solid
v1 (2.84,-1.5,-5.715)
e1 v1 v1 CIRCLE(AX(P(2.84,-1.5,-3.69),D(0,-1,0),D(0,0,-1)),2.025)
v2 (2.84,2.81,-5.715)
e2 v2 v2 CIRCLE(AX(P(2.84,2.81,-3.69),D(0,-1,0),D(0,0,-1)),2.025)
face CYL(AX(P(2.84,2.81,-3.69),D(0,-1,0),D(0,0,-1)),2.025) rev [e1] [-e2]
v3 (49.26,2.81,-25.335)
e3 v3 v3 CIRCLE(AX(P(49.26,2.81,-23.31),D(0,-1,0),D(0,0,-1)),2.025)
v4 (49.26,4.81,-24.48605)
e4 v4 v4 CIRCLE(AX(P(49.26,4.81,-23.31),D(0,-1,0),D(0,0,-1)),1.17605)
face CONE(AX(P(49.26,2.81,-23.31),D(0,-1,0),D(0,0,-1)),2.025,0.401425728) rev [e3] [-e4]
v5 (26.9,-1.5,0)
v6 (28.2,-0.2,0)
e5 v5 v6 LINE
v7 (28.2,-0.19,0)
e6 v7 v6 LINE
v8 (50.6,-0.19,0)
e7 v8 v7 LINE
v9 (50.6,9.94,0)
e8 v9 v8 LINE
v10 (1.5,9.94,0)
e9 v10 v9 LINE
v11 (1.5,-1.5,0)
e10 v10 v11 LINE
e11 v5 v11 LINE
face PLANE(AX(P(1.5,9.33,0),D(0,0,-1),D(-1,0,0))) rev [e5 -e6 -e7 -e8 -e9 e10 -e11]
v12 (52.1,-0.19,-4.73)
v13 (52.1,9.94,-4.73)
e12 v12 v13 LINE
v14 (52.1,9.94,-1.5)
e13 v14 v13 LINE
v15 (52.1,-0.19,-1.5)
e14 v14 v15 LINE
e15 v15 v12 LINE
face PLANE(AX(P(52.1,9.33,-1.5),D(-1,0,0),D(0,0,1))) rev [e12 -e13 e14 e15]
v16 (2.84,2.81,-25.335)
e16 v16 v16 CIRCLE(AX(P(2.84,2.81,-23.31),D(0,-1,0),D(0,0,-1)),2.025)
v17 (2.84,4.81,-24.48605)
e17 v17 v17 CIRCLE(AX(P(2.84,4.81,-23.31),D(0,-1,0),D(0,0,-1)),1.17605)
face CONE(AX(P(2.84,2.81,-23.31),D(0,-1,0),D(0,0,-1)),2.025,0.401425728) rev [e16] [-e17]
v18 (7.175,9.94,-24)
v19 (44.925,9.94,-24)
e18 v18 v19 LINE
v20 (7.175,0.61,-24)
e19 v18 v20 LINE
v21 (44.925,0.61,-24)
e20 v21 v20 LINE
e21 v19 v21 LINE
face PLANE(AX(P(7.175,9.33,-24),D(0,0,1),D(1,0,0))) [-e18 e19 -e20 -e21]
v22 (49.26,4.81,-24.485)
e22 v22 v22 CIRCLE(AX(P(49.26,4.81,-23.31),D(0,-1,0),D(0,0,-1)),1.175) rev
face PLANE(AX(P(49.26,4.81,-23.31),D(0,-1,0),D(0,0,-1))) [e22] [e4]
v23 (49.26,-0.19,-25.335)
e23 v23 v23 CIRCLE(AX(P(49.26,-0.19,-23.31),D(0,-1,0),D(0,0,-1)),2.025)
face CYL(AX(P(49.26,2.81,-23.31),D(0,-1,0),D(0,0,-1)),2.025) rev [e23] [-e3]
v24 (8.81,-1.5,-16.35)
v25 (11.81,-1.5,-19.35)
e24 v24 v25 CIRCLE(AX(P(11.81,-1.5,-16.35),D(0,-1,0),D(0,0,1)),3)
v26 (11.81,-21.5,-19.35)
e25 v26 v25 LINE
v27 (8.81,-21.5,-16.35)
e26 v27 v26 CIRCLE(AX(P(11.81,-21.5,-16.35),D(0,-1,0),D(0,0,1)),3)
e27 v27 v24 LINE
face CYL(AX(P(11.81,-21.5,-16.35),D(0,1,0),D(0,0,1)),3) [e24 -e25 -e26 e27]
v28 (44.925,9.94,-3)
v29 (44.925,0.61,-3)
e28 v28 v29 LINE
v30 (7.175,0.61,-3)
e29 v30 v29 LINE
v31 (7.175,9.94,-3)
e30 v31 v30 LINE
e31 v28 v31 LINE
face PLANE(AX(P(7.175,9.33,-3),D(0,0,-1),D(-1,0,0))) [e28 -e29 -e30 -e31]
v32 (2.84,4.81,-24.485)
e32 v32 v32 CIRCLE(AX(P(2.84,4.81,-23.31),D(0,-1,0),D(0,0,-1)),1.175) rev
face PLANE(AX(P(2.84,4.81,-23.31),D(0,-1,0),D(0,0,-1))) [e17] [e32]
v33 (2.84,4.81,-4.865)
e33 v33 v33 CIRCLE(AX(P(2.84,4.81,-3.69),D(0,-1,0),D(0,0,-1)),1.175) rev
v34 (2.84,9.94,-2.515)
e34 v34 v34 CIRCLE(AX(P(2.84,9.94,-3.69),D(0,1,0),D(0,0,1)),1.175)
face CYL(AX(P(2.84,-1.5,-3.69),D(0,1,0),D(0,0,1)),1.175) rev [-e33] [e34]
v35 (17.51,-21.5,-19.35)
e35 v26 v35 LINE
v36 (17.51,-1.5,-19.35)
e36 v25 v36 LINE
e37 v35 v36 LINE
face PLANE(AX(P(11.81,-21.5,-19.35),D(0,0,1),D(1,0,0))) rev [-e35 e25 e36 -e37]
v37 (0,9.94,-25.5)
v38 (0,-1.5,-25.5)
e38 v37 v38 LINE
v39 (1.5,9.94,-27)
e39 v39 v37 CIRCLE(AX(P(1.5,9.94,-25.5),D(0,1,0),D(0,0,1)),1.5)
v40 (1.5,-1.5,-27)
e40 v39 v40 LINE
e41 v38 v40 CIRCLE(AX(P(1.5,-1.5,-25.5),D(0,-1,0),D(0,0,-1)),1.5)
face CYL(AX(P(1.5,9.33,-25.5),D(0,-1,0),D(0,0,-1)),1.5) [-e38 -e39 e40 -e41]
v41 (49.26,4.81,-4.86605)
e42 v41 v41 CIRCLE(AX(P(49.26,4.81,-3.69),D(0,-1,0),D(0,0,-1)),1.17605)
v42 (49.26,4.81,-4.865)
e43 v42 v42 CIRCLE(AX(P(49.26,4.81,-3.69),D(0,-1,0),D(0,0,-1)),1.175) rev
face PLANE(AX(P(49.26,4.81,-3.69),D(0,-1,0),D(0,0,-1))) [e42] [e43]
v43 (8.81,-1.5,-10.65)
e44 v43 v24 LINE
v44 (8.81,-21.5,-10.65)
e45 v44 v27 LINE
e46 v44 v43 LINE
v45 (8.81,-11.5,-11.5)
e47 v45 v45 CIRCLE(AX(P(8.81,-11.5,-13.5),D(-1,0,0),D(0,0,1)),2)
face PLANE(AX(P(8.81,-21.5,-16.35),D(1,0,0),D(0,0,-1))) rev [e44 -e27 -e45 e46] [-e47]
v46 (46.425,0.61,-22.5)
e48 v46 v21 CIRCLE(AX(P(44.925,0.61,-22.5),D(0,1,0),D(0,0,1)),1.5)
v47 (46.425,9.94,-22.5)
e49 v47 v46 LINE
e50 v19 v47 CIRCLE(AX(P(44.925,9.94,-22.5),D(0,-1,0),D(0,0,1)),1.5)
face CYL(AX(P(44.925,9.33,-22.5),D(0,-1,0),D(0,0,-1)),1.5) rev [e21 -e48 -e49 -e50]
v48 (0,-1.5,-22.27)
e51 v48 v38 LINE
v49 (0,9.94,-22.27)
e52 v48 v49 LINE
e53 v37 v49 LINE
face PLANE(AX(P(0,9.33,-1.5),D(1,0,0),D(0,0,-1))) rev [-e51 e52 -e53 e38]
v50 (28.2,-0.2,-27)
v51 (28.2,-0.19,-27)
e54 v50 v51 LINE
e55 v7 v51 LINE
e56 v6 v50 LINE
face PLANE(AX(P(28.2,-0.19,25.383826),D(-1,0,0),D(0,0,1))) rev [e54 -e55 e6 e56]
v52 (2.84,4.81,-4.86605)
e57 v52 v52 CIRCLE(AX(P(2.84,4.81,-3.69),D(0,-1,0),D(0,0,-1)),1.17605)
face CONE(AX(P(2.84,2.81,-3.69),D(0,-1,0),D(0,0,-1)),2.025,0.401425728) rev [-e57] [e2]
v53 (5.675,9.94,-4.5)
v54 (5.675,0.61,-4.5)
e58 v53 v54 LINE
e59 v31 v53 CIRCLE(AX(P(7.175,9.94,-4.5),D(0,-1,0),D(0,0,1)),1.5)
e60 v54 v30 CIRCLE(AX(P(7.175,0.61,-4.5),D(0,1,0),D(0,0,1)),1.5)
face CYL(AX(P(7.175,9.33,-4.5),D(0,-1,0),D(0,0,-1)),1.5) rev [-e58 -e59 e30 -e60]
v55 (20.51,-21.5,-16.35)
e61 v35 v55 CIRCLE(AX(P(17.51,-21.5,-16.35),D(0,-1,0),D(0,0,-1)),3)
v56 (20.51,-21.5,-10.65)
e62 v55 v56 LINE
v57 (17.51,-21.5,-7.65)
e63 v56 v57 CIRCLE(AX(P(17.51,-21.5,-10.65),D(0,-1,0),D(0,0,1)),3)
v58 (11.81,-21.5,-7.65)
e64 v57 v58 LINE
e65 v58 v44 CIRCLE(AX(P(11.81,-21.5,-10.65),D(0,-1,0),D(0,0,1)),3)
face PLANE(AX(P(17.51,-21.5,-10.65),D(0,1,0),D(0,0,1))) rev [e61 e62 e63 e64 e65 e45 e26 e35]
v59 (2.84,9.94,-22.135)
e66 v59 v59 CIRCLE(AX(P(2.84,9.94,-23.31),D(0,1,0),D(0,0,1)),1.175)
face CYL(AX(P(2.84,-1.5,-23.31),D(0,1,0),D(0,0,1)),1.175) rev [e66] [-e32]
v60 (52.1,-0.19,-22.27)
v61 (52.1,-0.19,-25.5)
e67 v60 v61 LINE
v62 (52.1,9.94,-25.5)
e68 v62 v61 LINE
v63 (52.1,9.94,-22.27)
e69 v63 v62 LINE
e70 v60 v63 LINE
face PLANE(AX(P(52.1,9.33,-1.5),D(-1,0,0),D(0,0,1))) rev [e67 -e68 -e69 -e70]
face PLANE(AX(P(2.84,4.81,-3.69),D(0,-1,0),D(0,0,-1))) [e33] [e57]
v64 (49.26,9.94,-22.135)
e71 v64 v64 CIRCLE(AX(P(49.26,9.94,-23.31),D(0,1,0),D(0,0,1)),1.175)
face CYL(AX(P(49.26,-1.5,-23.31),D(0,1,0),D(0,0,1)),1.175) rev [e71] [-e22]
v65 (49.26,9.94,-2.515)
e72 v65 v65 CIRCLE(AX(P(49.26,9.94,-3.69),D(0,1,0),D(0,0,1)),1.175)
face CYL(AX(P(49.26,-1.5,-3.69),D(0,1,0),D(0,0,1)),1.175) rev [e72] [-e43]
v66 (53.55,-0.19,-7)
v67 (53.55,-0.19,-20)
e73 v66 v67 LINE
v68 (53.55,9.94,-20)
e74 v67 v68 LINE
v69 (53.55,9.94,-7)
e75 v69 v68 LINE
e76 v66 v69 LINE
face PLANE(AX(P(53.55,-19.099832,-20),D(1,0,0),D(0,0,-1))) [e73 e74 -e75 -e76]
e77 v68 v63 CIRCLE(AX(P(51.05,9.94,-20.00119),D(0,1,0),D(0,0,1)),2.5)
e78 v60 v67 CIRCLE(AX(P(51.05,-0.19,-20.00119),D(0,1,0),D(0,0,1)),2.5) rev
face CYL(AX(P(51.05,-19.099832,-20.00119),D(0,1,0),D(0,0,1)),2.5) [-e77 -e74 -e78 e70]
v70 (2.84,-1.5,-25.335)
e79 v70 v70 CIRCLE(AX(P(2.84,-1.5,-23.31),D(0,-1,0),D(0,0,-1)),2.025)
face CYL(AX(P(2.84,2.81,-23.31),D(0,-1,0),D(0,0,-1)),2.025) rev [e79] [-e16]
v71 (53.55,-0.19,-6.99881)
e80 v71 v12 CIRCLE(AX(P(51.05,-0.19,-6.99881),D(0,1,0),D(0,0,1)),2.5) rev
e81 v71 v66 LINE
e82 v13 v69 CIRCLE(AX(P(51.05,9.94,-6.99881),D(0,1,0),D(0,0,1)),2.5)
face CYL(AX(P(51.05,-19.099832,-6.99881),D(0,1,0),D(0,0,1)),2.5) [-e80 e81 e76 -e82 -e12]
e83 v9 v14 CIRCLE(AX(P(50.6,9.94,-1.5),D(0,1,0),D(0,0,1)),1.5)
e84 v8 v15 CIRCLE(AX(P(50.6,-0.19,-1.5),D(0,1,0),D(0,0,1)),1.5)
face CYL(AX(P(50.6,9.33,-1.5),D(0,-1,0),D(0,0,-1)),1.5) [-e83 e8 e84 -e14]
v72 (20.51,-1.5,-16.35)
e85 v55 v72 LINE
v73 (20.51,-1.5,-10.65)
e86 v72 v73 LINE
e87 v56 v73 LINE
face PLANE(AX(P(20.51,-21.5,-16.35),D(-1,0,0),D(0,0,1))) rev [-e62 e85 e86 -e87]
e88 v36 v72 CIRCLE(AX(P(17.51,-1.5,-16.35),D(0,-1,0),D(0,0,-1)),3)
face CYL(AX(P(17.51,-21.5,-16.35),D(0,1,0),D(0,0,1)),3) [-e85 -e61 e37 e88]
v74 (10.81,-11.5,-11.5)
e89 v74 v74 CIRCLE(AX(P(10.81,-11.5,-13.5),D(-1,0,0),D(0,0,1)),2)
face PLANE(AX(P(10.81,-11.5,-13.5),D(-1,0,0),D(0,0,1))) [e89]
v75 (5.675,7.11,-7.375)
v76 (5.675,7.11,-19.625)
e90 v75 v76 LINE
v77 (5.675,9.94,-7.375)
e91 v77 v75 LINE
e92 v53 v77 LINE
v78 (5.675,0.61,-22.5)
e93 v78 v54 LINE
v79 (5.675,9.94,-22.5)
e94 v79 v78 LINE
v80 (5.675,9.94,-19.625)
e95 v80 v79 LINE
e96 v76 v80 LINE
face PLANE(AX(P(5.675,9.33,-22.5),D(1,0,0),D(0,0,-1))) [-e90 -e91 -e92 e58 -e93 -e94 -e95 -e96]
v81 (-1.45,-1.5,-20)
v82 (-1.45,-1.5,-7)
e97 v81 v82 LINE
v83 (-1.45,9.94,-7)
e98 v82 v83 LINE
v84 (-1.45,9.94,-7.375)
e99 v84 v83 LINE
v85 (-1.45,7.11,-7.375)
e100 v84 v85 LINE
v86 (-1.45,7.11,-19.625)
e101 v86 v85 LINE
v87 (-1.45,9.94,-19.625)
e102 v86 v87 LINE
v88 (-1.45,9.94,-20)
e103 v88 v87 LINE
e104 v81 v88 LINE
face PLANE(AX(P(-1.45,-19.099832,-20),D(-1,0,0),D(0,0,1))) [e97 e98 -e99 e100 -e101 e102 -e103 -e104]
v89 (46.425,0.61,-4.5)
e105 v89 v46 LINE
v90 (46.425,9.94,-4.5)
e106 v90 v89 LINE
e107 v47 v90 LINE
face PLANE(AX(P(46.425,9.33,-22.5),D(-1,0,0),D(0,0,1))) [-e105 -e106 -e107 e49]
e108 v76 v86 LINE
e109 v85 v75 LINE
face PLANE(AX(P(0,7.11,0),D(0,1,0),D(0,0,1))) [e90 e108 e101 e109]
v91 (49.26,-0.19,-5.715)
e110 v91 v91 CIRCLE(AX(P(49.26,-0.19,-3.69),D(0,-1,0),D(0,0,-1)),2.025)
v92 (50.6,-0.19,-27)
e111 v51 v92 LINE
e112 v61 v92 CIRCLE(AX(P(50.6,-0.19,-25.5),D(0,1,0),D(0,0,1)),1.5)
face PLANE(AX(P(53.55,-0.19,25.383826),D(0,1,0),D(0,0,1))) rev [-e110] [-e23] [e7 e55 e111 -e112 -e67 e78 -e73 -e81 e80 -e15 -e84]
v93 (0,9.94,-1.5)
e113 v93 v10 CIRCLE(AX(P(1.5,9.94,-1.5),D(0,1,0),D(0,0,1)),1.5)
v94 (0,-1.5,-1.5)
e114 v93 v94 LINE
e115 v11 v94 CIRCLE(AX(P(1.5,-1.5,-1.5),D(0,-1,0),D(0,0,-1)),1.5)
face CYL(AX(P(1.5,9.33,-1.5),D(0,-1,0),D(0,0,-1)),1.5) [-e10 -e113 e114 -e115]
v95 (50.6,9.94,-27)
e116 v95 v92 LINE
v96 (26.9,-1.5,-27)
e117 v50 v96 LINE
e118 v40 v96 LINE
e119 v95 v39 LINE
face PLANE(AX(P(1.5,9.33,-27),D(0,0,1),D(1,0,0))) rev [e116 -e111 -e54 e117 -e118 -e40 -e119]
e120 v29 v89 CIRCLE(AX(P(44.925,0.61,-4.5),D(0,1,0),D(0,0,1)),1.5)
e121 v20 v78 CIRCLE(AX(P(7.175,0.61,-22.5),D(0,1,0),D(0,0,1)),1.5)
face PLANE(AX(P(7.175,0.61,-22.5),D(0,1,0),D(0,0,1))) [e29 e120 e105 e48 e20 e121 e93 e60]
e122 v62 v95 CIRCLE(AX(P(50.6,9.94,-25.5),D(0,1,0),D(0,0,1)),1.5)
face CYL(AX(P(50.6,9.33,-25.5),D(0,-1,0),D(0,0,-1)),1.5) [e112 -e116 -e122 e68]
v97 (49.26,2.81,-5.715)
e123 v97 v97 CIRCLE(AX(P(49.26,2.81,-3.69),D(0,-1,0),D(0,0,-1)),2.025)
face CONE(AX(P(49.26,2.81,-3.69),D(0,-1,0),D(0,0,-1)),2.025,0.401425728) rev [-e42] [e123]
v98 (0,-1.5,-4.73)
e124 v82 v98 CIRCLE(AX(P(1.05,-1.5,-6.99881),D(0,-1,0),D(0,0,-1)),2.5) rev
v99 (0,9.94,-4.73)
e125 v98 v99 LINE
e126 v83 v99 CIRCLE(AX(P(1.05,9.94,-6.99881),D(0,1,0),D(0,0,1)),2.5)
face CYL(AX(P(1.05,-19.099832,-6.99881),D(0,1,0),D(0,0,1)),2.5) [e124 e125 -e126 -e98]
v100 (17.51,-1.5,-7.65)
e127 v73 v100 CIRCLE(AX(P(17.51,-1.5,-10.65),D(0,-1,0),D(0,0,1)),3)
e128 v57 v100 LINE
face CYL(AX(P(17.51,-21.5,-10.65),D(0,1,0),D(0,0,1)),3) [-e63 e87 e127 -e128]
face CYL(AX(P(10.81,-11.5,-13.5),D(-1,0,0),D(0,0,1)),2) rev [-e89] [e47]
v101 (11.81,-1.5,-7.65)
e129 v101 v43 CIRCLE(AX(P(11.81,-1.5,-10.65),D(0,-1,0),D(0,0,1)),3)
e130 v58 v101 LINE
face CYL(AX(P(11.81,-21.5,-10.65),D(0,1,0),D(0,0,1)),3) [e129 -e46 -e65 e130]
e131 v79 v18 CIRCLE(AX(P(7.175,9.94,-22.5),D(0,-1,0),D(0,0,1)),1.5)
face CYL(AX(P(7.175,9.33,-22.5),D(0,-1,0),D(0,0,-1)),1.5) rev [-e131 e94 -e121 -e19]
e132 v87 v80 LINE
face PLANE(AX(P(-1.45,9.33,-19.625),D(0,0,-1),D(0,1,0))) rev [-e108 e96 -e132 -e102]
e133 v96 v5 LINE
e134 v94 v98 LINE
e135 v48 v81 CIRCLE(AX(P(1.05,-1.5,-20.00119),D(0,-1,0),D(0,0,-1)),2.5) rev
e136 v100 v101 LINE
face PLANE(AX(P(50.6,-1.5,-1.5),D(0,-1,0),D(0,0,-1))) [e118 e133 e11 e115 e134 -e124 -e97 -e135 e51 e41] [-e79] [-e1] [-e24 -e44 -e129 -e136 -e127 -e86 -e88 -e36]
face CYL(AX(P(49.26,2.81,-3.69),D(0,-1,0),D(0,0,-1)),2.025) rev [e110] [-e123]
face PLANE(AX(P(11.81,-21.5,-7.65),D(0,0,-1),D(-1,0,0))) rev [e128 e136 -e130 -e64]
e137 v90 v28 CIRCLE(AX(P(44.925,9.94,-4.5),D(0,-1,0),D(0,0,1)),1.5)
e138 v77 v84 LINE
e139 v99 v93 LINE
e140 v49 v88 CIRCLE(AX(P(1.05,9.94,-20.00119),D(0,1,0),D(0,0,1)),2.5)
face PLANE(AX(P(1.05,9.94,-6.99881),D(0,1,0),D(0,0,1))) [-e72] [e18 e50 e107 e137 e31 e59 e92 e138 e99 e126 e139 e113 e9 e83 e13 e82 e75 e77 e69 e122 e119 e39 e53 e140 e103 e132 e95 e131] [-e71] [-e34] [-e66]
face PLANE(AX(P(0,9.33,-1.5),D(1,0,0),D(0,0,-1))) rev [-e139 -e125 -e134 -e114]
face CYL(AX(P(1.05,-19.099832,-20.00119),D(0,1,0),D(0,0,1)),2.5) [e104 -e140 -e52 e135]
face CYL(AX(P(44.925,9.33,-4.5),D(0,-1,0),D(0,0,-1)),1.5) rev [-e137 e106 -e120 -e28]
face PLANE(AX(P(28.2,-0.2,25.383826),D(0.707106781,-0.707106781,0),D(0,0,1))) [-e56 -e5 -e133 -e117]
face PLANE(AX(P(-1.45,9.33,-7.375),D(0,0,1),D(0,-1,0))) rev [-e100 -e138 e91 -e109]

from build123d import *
from build123d.topology import SkipClean

# Parameters (mm, degrees)
SALIENTE_EXTRUIR1_DEPTH         = 9.33
SALIENTE_EXTRUIR2_START         = 1.5
SALIENTE_EXTRUIR2_DEPTH         = 1.5
CROQUIS3_R                      = 1.175
CORTAR_EXTRUIR1_DEPTH           = 60.671592069
CROQUIS4_R                      = 2.025
CORTAR_EXTRUIR2_DEPTH           = 2
CORTAR_EXTRUIR2_DRAFT           = -23
CORTAR_EXTRUIR2_PROFILE_2_DEPTH = 2
CORTAR_EXTRUIR2_PROFILE_2_DRAFT = -23
CORTAR_EXTRUIR2_PROFILE_3_DEPTH = 2
CORTAR_EXTRUIR2_PROFILE_3_DRAFT = -23
CORTAR_EXTRUIR2_PROFILE_4_DEPTH = 2
CORTAR_EXTRUIR2_PROFILE_4_DRAFT = -23
SALIENTE_EXTRUIR3_DEPTH         = 10.83
CROQUIS6_W                      = 12.25
CROQUIS6_H                      = 2.83
CORTAR_EXTRUIR3_DEPTH           = 56.750018404
SALIENTE_EXTRUIR4_DEPTH         = 20
CORTAR_EXTRUIR4_REACH           = 65.709
CHAFL_N1_SIZE                   = 1.3
SALIENTE_EXTRUIR5_DEPTH         = 0.61
SALIENTE_EXTRUIR6_DEPTH         = 0.61
CROQUIS12_R                     = 1.175
SALIENTE_EXTRUIR7_DEPTH         = 0.61
CROQUIS13_R                     = 2.025
CORTAR_EXTRUIR5_DEPTH           = 3
CROQUIS14_R                     = 2.025
CORTAR_EXTRUIR6_DEPTH           = 3
CROQUIS15_R                     = 2.025
CORTAR_EXTRUIR7_DEPTH           = 2
CORTAR_EXTRUIR7_DRAFT           = -23
CORTAR_EXTRUIR7_PROFILE_2_DEPTH = 2
CORTAR_EXTRUIR7_PROFILE_2_DRAFT = -23
CROQUIS16_R                     = 2.025
CORTAR_EXTRUIR8_DEPTH           = 4.31
CROQUIS17_R                     = 2.025
CORTAR_EXTRUIR9_DEPTH           = 2
CORTAR_EXTRUIR9_DRAFT           = -23
CORTAR_EXTRUIR9_PROFILE_2_DEPTH = 2
CORTAR_EXTRUIR9_PROFILE_2_DRAFT = -23
CROQUIS18_R                     = 2
CORTAR_EXTRUIR10_DEPTH          = 2


with BuildPart() as part:
    # Croquis1 → Saliente-Extruir1 (new body)
    with BuildSketch(Plane(origin=(0, 0, 0), x_dir=(1, 0, 0), z_dir=(0, 1, 0))):
        with BuildLine():
            Line((1.5, 0), (50.6, 0))
            ThreePointArc((50.6, 0), (51.660660172, 0.439339828), (52.1, 1.5))
            Line((52.1, 1.5), (52.1, 25.5))
            ThreePointArc((52.1, 25.5), (51.660660172, 26.560660172), (50.6, 27))
            Line((50.6, 27), (1.5, 27))
            ThreePointArc((1.5, 27), (0.439339828, 26.560660172), (0, 25.5))
            Line((0, 25.5), (0, 1.5))
            ThreePointArc((0, 1.5), (0.439339828, 0.439339828), (1.5, 0))
        make_face()
        with BuildLine():
            Line((7.175, 24), (44.925, 24))
            ThreePointArc((44.925, 24), (45.985660172, 23.560660172), (46.425, 22.5))
            Line((46.425, 22.5), (46.425, 4.5))
            ThreePointArc((46.425, 4.5), (45.985660172, 3.439339828), (44.925, 3))
            Line((44.925, 3), (7.175, 3))
            ThreePointArc((7.175, 3), (6.114339828, 3.439339828), (5.675, 4.5))
            Line((5.675, 4.5), (5.675, 22.5))
            ThreePointArc((5.675, 22.5), (6.114339828, 23.560660172), (7.175, 24))
        make_face(mode=Mode.SUBTRACT)
    extrude(amount=SALIENTE_EXTRUIR1_DEPTH)

    # Croquis2 → Saliente-Extruir2 (add)
    with BuildSketch(Plane.XZ.offset(SALIENTE_EXTRUIR2_START)):
        with BuildLine():
            Line((50.6, 0), (1.5, 0))
            ThreePointArc((1.5, 0), (0.439339828, -0.439339828), (0, -1.5))
            Line((0, -1.5), (0, -25.5))
            ThreePointArc((0, -25.5), (0.439339828, -26.560660172), (1.5, -27))
            Line((1.5, -27), (50.6, -27))
            ThreePointArc((50.6, -27), (51.660660172, -26.560660172), (52.1, -25.5))
            Line((52.1, -25.5), (52.1, -1.5))
            ThreePointArc((52.1, -1.5), (51.660660172, -0.439339828), (50.6, 0))
        make_face()
    extrude(amount=-SALIENTE_EXTRUIR2_DEPTH)

    # Croquis3 → Cortar-Extruir1 (cut, through all)
    with BuildSketch(Plane(origin=(0, 9.33, 0), x_dir=(1, 0, 0), z_dir=(0, 1, 0))):
        with Locations(Location((2.84, 23.31, 0), (0, 0, 270))):
            Circle(CROQUIS3_R)
        with Locations(Location((49.26, 23.31, 0), (0, 0, 90))):
            Circle(CROQUIS3_R)
        with Locations(Location((49.26, 3.69, 0), (0, 0, 270))):
            Circle(CROQUIS3_R)
        with Locations(Location((2.84, 3.69, 0), (0, 0, 90))):
            Circle(CROQUIS3_R)
    extrude(amount=-CORTAR_EXTRUIR1_DEPTH, mode=Mode.SUBTRACT)


with BuildPart() as cortar_extruir2_tool:
    # Croquis4 → Cortar-Extruir2 (with draft: the straight prism first)
    with BuildSketch(Plane.XZ.offset(1.5)):
        with Locations((49.26, -23.31)):
            Circle(CROQUIS4_R)
    extrude(amount=-CORTAR_EXTRUIR2_DEPTH)
    # Cortar-Extruir2: the draft: its side faces are tilted about the plane it starts from
    cortar_extruir2_sides = [cortar_extruir2_tool.faces().sort_by_distance(p)[0] for p in [
        (47.235, -0.5, -23.31),
    ]]
    draft(cortar_extruir2_sides, Plane.XZ.offset(1.5), CORTAR_EXTRUIR2_DRAFT)


with BuildPart() as part_1:
    add(part.part)

    # Cortar-Extruir2: cut by cortar_extruir2_tool
    add(cortar_extruir2_tool.part, mode=Mode.SUBTRACT)


with BuildPart() as cortar_extruir2_profile_2_tool:
    # Croquis4 → Cortar-Extruir2 profile 2 (with draft: the straight prism first)
    with BuildSketch(Plane.XZ.offset(1.5)):
        with Locations((2.84, -23.31)):
            Circle(CROQUIS4_R)
    extrude(amount=-CORTAR_EXTRUIR2_PROFILE_2_DEPTH)
    # Cortar-Extruir2 profile 2: the draft: its side faces are tilted about the plane it starts from
    cortar_extruir2_profile_2_sides = [cortar_extruir2_profile_2_tool.faces().sort_by_distance(p)[0] for p in [
        (0.815, -0.5, -23.31),
    ]]
    draft(cortar_extruir2_profile_2_sides, Plane.XZ.offset(1.5), CORTAR_EXTRUIR2_PROFILE_2_DRAFT)


with BuildPart() as part_2:
    add(part_1.part)

    # Cortar-Extruir2 profile 2: cut by cortar_extruir2_profile_2_tool
    add(cortar_extruir2_profile_2_tool.part, mode=Mode.SUBTRACT)


with BuildPart() as cortar_extruir2_profile_3_tool:
    # Croquis4 → Cortar-Extruir2 profile 3 (with draft: the straight prism first)
    with BuildSketch(Plane.XZ.offset(1.5)):
        with Locations((2.84, -3.69)):
            Circle(CROQUIS4_R)
    extrude(amount=-CORTAR_EXTRUIR2_PROFILE_3_DEPTH)
    # Cortar-Extruir2 profile 3: the draft: its side faces are tilted about the plane it starts from
    cortar_extruir2_profile_3_sides = [cortar_extruir2_profile_3_tool.faces().sort_by_distance(p)[0] for p in [
        (0.815, -0.5, -3.69),
    ]]
    draft(cortar_extruir2_profile_3_sides, Plane.XZ.offset(1.5), CORTAR_EXTRUIR2_PROFILE_3_DRAFT)


with BuildPart() as part_3:
    add(part_2.part)

    # Cortar-Extruir2 profile 3: cut by cortar_extruir2_profile_3_tool
    add(cortar_extruir2_profile_3_tool.part, mode=Mode.SUBTRACT)


with BuildPart() as cortar_extruir2_profile_4_tool:
    # Croquis4 → Cortar-Extruir2 profile 4 (with draft: the straight prism first)
    with BuildSketch(Plane.XZ.offset(1.5)):
        with Locations((49.26, -3.69)):
            Circle(CROQUIS4_R)
    extrude(amount=-CORTAR_EXTRUIR2_PROFILE_4_DEPTH)
    # Cortar-Extruir2 profile 4: the draft: its side faces are tilted about the plane it starts from
    cortar_extruir2_profile_4_sides = [cortar_extruir2_profile_4_tool.faces().sort_by_distance(p)[0] for p in [
        (47.235, -0.5, -3.69),
    ]]
    draft(cortar_extruir2_profile_4_sides, Plane.XZ.offset(1.5), CORTAR_EXTRUIR2_PROFILE_4_DRAFT)


with BuildPart() as part_4:
    add(part_3.part)

    # Cortar-Extruir2 profile 4: cut by cortar_extruir2_profile_4_tool
    add(cortar_extruir2_profile_4_tool.part, mode=Mode.SUBTRACT)

    # Croquis5 → Saliente-Extruir3 (add)
    with BuildSketch(Plane(origin=(0, 9.33, 0), x_dir=(1, 0, 0), z_dir=(0, 1, 0))):
        with BuildLine():
            Line((0, 22.27), (0, 4.73))
            ThreePointArc((0, 4.73), (-1.056857895, 5.653020288), (-1.45, 7))
            Line((-1.45, 7), (-1.45, 20))
            ThreePointArc((-1.45, 20), (-1.056857895, 21.346979712), (0, 22.27))
        make_face()
        with BuildLine():
            Line((53.55, 20), (53.55, 7))
            ThreePointArc((53.55, 7), (53.156857895, 5.653020288), (52.1, 4.73))
            Line((52.1, 4.73), (52.1, 22.27))
            ThreePointArc((52.1, 22.27), (53.156857895, 21.346979712), (53.55, 20))
        make_face()
    extrude(amount=-SALIENTE_EXTRUIR3_DEPTH)

    # Croquis6 → Cortar-Extruir3 (cut, through all)
    with BuildSketch(Plane(origin=(5.675, 0, 0), x_dir=(0, 0, -1), z_dir=(1, 0, 0))):
        with Locations((13.5, 7.915)):
            Rectangle(CROQUIS6_W, CROQUIS6_H)
    extrude(amount=-CORTAR_EXTRUIR3_DEPTH, mode=Mode.SUBTRACT)

    # Croquis7 → Saliente-Extruir4 (add)
    with BuildSketch(Plane.XZ.offset(1.5)):
        with BuildLine():
            Line((11.81, -19.35), (17.51, -19.35))
            ThreePointArc((17.51, -19.35), (19.631320344, -18.471320344), (20.51, -16.35))
            Line((20.51, -16.35), (20.51, -10.65))
            ThreePointArc((20.51, -10.65), (19.631320344, -8.528679656), (17.51, -7.65))
            Line((17.51, -7.65), (11.81, -7.65))
            ThreePointArc((11.81, -7.65), (9.688679656, -8.528679656), (8.81, -10.65))
            Line((8.81, -10.65), (8.81, -16.35))
            ThreePointArc((8.81, -16.35), (9.688679656, -18.471320344), (11.81, -19.35))
        make_face()
    extrude(amount=SALIENTE_EXTRUIR4_DEPTH)

    # Cortar-Extruir4: up to this face of the body (flat: up to its plane)
    cortar_extruir4_end = Plane(part_4.part.faces().sort_by_distance((26.05, 3.915, 0))[0])
    # Croquis8 → Cortar-Extruir4 (cut, up to the picked face)
    with BuildSketch(Plane(origin=(0, 0, -27), x_dir=(-1, 0, 0), z_dir=(0, 0, -1)), mode=Mode.PRIVATE) as cortar_extruir4_sk1:
        Polygon((-53.55, -0.19), (-28.2, -0.19), (-28.2, -1.5), (-28.55, -1.5), (-53.55, -1.5), (-53.55, -0.54), align=None)
    cortar_extruir4_tool1 = split(extrude(cortar_extruir4_sk1.sketch, amount=-CORTAR_EXTRUIR4_REACH, mode=Mode.PRIVATE), bisect_by=cortar_extruir4_end, keep=Keep.BOTH, mode=Mode.PRIVATE)
    add(cortar_extruir4_tool1.solids().sort_by(Axis((40.875, -0.845, -27), (0, 0, 1)))[0], mode=Mode.SUBTRACT)

    # Chaflán1
    chafl_n1_edges = [part_4.edges().sort_by_distance(p)[0] for p in [
        (28.2, -1.5, -13.5),
    ]]
    chamfer(chafl_n1_edges, length=CHAFL_N1_SIZE)

    # Croquis10 → Saliente-Extruir5 (add)
    with BuildSketch(Plane(origin=(0, 0, 0), x_dir=(1, 0, 0), z_dir=(0, 1, 0))):
        with BuildLine():
            Line((5.675, 22.5), (5.675, 4.5))
            ThreePointArc((5.675, 4.5), (6.114339828, 3.439339828), (7.175, 3))
            Line((7.175, 3), (44.925, 3))
            ThreePointArc((44.925, 3), (45.985660172, 3.439339828), (46.425, 4.5))
            Line((46.425, 4.5), (46.425, 22.5))
            ThreePointArc((46.425, 22.5), (45.985660172, 23.560660172), (44.925, 24))
            Line((44.925, 24), (7.175, 24))
            ThreePointArc((7.175, 24), (6.114339828, 23.560660172), (5.675, 22.5))
        make_face()
    extrude(amount=SALIENTE_EXTRUIR5_DEPTH)

    # Croquis11 → Saliente-Extruir6 (add)
    with BuildSketch(Plane(origin=(0, 6.5, 0), x_dir=(1, 0, 0), z_dir=(0, 1, 0))):
        Polygon((5.675, 7.375), (5.675, 19.625), (-1.45, 19.625), (-1.450000283, 7.375), align=None)
    extrude(amount=SALIENTE_EXTRUIR6_DEPTH)

    # Croquis12 → Saliente-Extruir7 (add)
    with SkipClean():  # the faces are left unmerged after this step: merging them gives an invalid solid
        with BuildSketch(Plane(origin=(0, 9.33, 0), x_dir=(1, 0, 0), z_dir=(0, 1, 0))):
            with BuildLine():
                Line((5.675, 7.375), (-1.450000283, 7.375))
                Line((-1.450000283, 7.375), (-1.45, 7))
                ThreePointArc((-1.45, 7), (-1.056857895, 5.653020288), (0, 4.73))
                Line((0, 4.73), (0, 1.5))
                ThreePointArc((0, 1.5), (0.439339828, 0.439339828), (1.5, 0))
                Line((1.5, 0), (50.6, 0))
                ThreePointArc((50.6, 0), (51.660660172, 0.439339828), (52.1, 1.5))
                Line((52.1, 1.5), (52.1, 4.73))
                ThreePointArc((52.1, 4.73), (53.156857895, 5.653020288), (53.55, 7))
                Line((53.55, 7), (53.55, 20))
                ThreePointArc((53.55, 20), (53.156857895, 21.346979712), (52.1, 22.27))
                Line((52.1, 22.27), (52.1, 25.5))
                ThreePointArc((52.1, 25.5), (51.660660172, 26.560660172), (50.6, 27))
                Line((50.6, 27), (1.5, 27))
                ThreePointArc((1.5, 27), (0.439339828, 26.560660172), (0, 25.5))
                Line((0, 25.5), (0, 22.27))
                ThreePointArc((0, 22.27), (-1.056857895, 21.346979712), (-1.45, 20))
                Line((-1.45, 20), (-1.450000283, 19.625))
                Line((-1.450000283, 19.625), (5.675, 19.625))
                Line((5.675, 19.625), (5.675, 22.5))
                ThreePointArc((5.675, 22.5), (6.114339828, 23.560660172), (7.175, 24))
                Line((7.175, 24), (44.925, 24))
                ThreePointArc((44.925, 24), (45.985660172, 23.560660172), (46.425, 22.5))
                Line((46.425, 22.5), (46.425, 4.5))
                ThreePointArc((46.425, 4.5), (45.985660172, 3.439339828), (44.925, 3))
                Line((44.925, 3), (7.175, 3))
                ThreePointArc((7.175, 3), (6.114339828, 3.439339828), (5.675, 4.5))
                Line((5.675, 4.5), (5.675, 7.375))
            make_face()
            with Locations(Location((49.26, 3.69, 0), (0, 0, 270))):
                Circle(CROQUIS12_R, mode=Mode.SUBTRACT)
            with Locations(Location((2.84, 3.69, 0), (0, 0, 270))):
                Circle(CROQUIS12_R, mode=Mode.SUBTRACT)
            with Locations(Location((2.84, 23.31, 0), (0, 0, 270))):
                Circle(CROQUIS12_R, mode=Mode.SUBTRACT)
            with Locations(Location((49.26, 23.31, 0), (0, 0, 270))):
                Circle(CROQUIS12_R, mode=Mode.SUBTRACT)
        extrude(amount=SALIENTE_EXTRUIR7_DEPTH)
    add(part_4.part.scale(1), mode=Mode.REPLACE)  # the faces are merged on a copy

    # Croquis13 → Cortar-Extruir5 (cut)
    with BuildSketch(Plane.XZ.offset(0.19)):
        with Locations(Location((49.26, -3.69, 0), (0, 0, 270))):
            Circle(CROQUIS13_R)
    extrude(amount=-CORTAR_EXTRUIR5_DEPTH, mode=Mode.SUBTRACT)

    # Croquis14 → Cortar-Extruir6 (cut)
    with BuildSketch(Plane.XZ.offset(0.19)):
        with Locations(Location((49.26, -23.31, 0), (0, 0, 270))):
            Circle(CROQUIS14_R)
    extrude(amount=-CORTAR_EXTRUIR6_DEPTH, mode=Mode.SUBTRACT)


with BuildPart() as cortar_extruir7_tool:
    # Croquis15 → Cortar-Extruir7 (with draft: the straight prism first)
    with BuildSketch(Plane.XZ.offset(-2.81)):
        with Locations(Location((49.26, -3.69, 0), (0, 0, 270))):
            Circle(CROQUIS15_R)
    extrude(amount=-CORTAR_EXTRUIR7_DEPTH)
    # Cortar-Extruir7: the draft: its side faces are tilted about the plane it starts from
    cortar_extruir7_sides = [cortar_extruir7_tool.faces().sort_by_distance(p)[0] for p in [
        (49.26, 3.81, -1.665),
    ]]
    draft(cortar_extruir7_sides, Plane.XZ.offset(-2.81), CORTAR_EXTRUIR7_DRAFT)


with BuildPart() as part_5:
    add(part_4.part)

    # Cortar-Extruir7: cut by cortar_extruir7_tool
    add(cortar_extruir7_tool.part, mode=Mode.SUBTRACT)


with BuildPart() as cortar_extruir7_profile_2_tool:
    # Croquis15 → Cortar-Extruir7 profile 2 (with draft: the straight prism first)
    with BuildSketch(Plane.XZ.offset(-2.81)):
        with Locations(Location((49.26, -23.31, 0), (0, 0, 270))):
            Circle(CROQUIS15_R)
    extrude(amount=-CORTAR_EXTRUIR7_PROFILE_2_DEPTH)
    # Cortar-Extruir7 profile 2: the draft: its side faces are tilted about the plane it starts from
    cortar_extruir7_profile_2_sides = [cortar_extruir7_profile_2_tool.faces().sort_by_distance(p)[0] for p in [
        (49.26, 3.81, -21.285),
    ]]
    draft(cortar_extruir7_profile_2_sides, Plane.XZ.offset(-2.81), CORTAR_EXTRUIR7_PROFILE_2_DRAFT)


with BuildPart() as part_6:
    add(part_5.part)

    # Cortar-Extruir7 profile 2: cut by cortar_extruir7_profile_2_tool
    add(cortar_extruir7_profile_2_tool.part, mode=Mode.SUBTRACT)

    # Croquis16 → Cortar-Extruir8 (cut)
    with BuildSketch(Plane.XZ.offset(1.5)):
        with Locations(Location((2.84, -23.31, 0), (0, 0, 270))):
            Circle(CROQUIS16_R)
        with Locations(Location((2.84, -3.69, 0), (0, 0, 270))):
            Circle(CROQUIS16_R)
    extrude(amount=-CORTAR_EXTRUIR8_DEPTH, mode=Mode.SUBTRACT)


with BuildPart() as cortar_extruir9_tool:
    # Croquis17 → Cortar-Extruir9 (with draft: the straight prism first)
    with BuildSketch(Plane.XZ.offset(-2.81)):
        with Locations(Location((2.84, -3.69, 0), (0, 0, 270))):
            Circle(CROQUIS17_R)
    extrude(amount=-CORTAR_EXTRUIR9_DEPTH)
    # Cortar-Extruir9: the draft: its side faces are tilted about the plane it starts from
    cortar_extruir9_sides = [cortar_extruir9_tool.faces().sort_by_distance(p)[0] for p in [
        (2.84, 3.81, -1.665),
    ]]
    draft(cortar_extruir9_sides, Plane.XZ.offset(-2.81), CORTAR_EXTRUIR9_DRAFT)


with BuildPart() as part_7:
    add(part_6.part)

    # Cortar-Extruir9: cut by cortar_extruir9_tool
    add(cortar_extruir9_tool.part, mode=Mode.SUBTRACT)


with BuildPart() as cortar_extruir9_profile_2_tool:
    # Croquis17 → Cortar-Extruir9 profile 2 (with draft: the straight prism first)
    with BuildSketch(Plane.XZ.offset(-2.81)):
        with Locations(Location((2.84, -23.31, 0), (0, 0, 270))):
            Circle(CROQUIS17_R)
    extrude(amount=-CORTAR_EXTRUIR9_PROFILE_2_DEPTH)
    # Cortar-Extruir9 profile 2: the draft: its side faces are tilted about the plane it starts from
    cortar_extruir9_profile_2_sides = [cortar_extruir9_profile_2_tool.faces().sort_by_distance(p)[0] for p in [
        (2.84, 3.81, -21.285),
    ]]
    draft(cortar_extruir9_profile_2_sides, Plane.XZ.offset(-2.81), CORTAR_EXTRUIR9_PROFILE_2_DRAFT)


with BuildPart() as part_8:
    add(part_7.part)

    # Cortar-Extruir9 profile 2: cut by cortar_extruir9_profile_2_tool
    add(cortar_extruir9_profile_2_tool.part, mode=Mode.SUBTRACT)

    # Croquis18 → Cortar-Extruir10 (cut)
    with BuildSketch(Plane.ZY.offset(-8.81)):
        with Locations((-13.5, -11.5)):
            Circle(CROQUIS18_R)
    extrude(amount=-CORTAR_EXTRUIR10_DEPTH, mode=Mode.SUBTRACT)


solid = part_8.part
